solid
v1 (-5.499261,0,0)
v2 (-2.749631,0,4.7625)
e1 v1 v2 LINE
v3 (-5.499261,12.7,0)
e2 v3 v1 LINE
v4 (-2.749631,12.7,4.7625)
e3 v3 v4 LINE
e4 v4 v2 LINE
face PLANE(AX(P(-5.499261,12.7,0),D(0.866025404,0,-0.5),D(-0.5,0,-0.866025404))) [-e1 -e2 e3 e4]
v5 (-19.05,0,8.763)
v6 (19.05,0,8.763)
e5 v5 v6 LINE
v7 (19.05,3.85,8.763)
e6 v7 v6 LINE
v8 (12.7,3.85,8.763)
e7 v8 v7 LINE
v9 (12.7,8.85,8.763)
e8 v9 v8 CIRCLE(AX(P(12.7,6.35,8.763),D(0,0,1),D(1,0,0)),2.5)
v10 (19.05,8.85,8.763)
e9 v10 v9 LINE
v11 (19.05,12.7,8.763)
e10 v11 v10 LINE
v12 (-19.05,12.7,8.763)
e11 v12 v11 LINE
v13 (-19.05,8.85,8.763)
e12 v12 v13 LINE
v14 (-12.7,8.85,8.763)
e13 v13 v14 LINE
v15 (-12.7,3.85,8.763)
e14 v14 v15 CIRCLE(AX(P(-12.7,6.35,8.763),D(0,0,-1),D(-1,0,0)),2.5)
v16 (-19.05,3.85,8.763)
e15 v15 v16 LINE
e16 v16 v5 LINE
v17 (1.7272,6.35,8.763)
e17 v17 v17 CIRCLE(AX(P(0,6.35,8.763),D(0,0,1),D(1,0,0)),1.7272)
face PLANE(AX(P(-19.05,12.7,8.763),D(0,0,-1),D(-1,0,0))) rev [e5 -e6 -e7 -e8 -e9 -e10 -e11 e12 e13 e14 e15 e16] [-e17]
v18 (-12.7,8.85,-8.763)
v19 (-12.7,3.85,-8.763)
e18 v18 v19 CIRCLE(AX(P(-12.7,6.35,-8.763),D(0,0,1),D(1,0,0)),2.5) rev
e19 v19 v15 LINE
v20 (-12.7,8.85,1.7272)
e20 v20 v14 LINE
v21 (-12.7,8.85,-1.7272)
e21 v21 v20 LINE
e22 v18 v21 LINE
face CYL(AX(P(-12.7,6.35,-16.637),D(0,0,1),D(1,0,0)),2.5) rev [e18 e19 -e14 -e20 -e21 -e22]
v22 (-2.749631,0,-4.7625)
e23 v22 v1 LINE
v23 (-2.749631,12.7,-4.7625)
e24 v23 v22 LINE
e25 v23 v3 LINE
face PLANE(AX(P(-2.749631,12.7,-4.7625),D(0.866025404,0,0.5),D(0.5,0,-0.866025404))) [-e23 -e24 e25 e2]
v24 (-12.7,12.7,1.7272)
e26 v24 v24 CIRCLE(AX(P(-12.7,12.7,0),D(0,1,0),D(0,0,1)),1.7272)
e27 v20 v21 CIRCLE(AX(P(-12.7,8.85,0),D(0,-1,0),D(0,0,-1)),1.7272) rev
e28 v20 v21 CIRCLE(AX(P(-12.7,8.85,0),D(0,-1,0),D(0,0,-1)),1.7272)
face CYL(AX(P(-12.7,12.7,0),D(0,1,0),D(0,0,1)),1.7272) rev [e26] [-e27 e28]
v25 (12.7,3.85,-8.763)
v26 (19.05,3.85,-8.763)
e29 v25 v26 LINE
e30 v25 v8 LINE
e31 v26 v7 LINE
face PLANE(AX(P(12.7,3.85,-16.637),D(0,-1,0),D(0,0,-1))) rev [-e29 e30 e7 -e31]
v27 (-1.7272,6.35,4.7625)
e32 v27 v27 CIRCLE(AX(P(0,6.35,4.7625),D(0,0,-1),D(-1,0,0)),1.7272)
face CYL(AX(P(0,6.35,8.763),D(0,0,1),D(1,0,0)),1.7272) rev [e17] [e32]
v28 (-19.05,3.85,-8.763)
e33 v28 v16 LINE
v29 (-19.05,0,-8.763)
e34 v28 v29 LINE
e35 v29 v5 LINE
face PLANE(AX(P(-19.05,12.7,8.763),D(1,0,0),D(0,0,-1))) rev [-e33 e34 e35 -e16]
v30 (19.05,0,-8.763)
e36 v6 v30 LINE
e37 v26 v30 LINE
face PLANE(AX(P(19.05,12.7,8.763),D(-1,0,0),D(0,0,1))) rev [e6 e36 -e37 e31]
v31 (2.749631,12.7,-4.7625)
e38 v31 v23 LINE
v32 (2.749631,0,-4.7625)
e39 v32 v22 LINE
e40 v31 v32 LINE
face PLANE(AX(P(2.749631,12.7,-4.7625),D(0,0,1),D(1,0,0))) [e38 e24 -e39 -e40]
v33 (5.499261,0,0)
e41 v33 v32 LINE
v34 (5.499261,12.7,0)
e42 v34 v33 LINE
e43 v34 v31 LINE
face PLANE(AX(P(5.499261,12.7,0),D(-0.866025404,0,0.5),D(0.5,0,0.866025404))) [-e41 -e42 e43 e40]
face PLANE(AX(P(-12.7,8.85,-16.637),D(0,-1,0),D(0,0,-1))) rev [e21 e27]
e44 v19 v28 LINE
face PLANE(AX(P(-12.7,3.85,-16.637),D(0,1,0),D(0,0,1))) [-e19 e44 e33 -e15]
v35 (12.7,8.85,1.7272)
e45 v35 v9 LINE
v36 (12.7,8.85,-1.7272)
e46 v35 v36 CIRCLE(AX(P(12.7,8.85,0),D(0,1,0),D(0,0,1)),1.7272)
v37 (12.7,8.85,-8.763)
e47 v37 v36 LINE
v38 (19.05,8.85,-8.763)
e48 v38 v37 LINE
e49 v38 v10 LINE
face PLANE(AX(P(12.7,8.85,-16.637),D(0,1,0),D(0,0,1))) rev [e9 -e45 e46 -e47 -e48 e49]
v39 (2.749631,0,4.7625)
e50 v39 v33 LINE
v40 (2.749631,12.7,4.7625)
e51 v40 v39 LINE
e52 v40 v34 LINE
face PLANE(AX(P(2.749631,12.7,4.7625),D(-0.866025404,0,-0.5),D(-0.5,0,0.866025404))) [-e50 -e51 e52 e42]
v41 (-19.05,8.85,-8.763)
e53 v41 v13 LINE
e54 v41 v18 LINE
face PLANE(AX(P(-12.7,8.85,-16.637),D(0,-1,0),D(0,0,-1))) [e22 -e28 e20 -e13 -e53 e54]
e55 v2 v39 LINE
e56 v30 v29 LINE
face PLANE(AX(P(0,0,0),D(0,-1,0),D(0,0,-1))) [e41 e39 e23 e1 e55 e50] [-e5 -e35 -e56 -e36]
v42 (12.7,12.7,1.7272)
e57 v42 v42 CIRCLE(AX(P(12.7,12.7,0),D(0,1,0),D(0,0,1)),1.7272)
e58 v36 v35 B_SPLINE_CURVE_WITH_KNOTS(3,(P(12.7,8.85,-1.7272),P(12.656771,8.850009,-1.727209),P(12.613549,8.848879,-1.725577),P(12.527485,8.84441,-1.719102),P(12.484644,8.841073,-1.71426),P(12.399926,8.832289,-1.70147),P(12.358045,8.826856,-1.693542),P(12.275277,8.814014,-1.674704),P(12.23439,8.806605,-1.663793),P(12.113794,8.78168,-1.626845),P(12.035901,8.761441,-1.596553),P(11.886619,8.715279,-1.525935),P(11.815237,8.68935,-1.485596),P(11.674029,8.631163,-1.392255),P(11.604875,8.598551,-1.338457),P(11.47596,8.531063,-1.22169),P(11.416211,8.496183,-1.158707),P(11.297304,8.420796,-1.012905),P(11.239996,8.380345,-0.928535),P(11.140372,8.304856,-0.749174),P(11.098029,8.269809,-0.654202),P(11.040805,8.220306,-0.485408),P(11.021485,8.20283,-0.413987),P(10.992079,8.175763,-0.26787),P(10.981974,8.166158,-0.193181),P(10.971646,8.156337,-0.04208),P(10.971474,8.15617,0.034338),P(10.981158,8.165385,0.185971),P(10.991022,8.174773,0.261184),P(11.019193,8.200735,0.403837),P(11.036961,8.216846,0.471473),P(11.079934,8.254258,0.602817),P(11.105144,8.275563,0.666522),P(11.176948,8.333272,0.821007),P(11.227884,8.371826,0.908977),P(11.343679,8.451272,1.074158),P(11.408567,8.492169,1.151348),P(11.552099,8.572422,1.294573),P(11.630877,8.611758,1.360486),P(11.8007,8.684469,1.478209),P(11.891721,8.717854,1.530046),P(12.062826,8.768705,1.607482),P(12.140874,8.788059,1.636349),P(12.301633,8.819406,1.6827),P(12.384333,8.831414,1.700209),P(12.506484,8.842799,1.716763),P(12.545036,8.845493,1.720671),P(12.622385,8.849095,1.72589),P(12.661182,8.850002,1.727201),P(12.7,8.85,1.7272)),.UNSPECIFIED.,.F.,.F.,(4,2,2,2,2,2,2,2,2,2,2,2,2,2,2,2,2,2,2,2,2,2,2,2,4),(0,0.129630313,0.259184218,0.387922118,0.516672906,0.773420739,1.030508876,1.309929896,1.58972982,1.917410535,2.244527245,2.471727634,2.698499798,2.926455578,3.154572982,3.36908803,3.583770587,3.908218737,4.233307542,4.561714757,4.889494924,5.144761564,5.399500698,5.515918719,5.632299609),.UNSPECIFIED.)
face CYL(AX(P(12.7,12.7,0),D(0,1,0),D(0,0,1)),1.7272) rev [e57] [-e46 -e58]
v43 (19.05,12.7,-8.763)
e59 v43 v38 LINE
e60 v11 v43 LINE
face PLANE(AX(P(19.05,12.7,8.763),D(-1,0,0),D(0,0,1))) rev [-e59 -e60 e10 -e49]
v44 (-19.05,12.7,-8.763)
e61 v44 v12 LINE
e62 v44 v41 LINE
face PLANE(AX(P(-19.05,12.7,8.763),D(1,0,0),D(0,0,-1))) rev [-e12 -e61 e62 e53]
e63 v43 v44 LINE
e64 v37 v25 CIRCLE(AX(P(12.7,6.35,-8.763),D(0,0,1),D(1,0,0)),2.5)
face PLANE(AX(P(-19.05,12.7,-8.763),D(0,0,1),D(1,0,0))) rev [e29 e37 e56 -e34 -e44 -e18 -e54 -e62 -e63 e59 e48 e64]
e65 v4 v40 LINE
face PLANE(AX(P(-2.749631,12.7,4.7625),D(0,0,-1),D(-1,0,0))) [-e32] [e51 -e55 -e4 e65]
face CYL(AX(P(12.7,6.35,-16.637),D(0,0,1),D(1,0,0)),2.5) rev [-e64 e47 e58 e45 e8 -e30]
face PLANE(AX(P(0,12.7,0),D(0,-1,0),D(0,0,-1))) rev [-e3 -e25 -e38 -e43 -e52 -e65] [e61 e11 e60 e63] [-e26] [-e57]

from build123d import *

# Parameters (mm, degrees)
SKETCH1_W                  = 38.1
SKETCH1_H                  = 17.526
BOSS_EXTRUDE1_DEPTH        = 12.7
CUT_EXTRUDE1_DEPTH         = 25.4
F_8_32_TAPPED_HOLE1_REACH  = 26.515
F_8_32_TAPPED_HOLE1_BORE_R = 1.7272
MIRROR1_START              = -8.763
MIRROR1_DEPTH              = 17.526
MIRROR1_START_2            = 8.85
MIRROR1_2_OUTLINE_R        = 1.7272
MIRROR1_2_DEPTH            = 5.15
F_8_32_TAPPED_HOLE2_D      = 3.4544
F_8_32_TAPPED_HOLE2_DEPTH  = 10.668
F_8_32_TAPPED_HOLE2_TIP    = 1.037806461


with BuildPart() as part:
    # Sketch1 → Boss-Extrude1 (new body)
    with BuildSketch(Plane(origin=(0, 0, 0), x_dir=(1, 0, 0), z_dir=(0, 1, 0))):
        Rectangle(SKETCH1_W, SKETCH1_H)
        Polygon((5.499261314, 0), (2.749630657, 4.7625), (-2.749630657, 4.7625), (-5.499261314, 0), (-2.749630657, -4.7625), (2.749630657, -4.7625), align=None, mode=Mode.SUBTRACT)
    extrude(amount=BOSS_EXTRUDE1_DEPTH)

    # Sketch2 → Cut-Extrude1 (cut)
    with BuildSketch(Plane.XY.offset(8.763)):
        with BuildLine():
            Line((12.7, 8.85), (19.05, 8.85))
            ThreePointArc((19.05, 8.85), (21.55, 6.35), (19.05, 3.85))
            Line((19.05, 3.85), (12.7, 3.85))
            ThreePointArc((12.7, 3.85), (10.2, 6.35), (12.7, 8.85))
        make_face()
    extrude(amount=-CUT_EXTRUDE1_DEPTH, mode=Mode.SUBTRACT)

    # #8-32 Tapped Hole1 bore → #8-32 Tapped Hole1 (cut, up to next)
    with BuildSketch(Plane(origin=(0, 12.7, 0), x_dir=(1, 0, 0), z_dir=(0, 1, 0)), mode=Mode.PRIVATE) as f_8_32_tapped_hole1_sk1:
        with Locations((12.7, 0)):
            Circle(F_8_32_TAPPED_HOLE1_BORE_R)
    f_8_32_tapped_hole1_tool1 = extrude(f_8_32_tapped_hole1_sk1.sketch, amount=-F_8_32_TAPPED_HOLE1_REACH, mode=Mode.PRIVATE) & part.part
    add(f_8_32_tapped_hole1_tool1.solids().sort_by_distance((12.7, 12.7, 0))[0], mode=Mode.SUBTRACT)

    # Mirror1: read off the stored shape, not the designer's step
    # Mirror1 outline → Mirror1 (cut)
    with BuildSketch(Plane.XY.offset(MIRROR1_START)):
        with BuildLine():
            Line((-12.7, 8.85), (-19.05, 8.85))
            Line((-19.05, 8.85), (-19.05, 3.85))
            Line((-19.05, 3.85), (-12.7, 3.85))
            ThreePointArc((-12.7, 3.85), (-10.2, 6.35), (-12.7, 8.85))
        make_face()
    extrude(amount=MIRROR1_DEPTH, mode=Mode.SUBTRACT)

    # Mirror1 2 outline → Mirror1 2 (cut)
    with BuildSketch(Plane(origin=(0, 0, 0), x_dir=(1, 0, 0), z_dir=(0, 1, 0)).offset(MIRROR1_START_2)):
        with Locations((-12.7, 0)):
            Circle(MIRROR1_2_OUTLINE_R)
    extrude(amount=MIRROR1_2_DEPTH, mode=Mode.SUBTRACT)

    # #8-32 Tapped Hole2
    with Locations(Plane.XY.offset(8.763)):
        with Locations((0, 6.35)):
            Hole(F_8_32_TAPPED_HOLE2_D / 2, depth=F_8_32_TAPPED_HOLE2_DEPTH)
            with Locations((0, 0, -(F_8_32_TAPPED_HOLE2_DEPTH + F_8_32_TAPPED_HOLE2_TIP / 2))):  # 118° drill point
                Cone(0, F_8_32_TAPPED_HOLE2_D / 2, F_8_32_TAPPED_HOLE2_TIP, mode=Mode.SUBTRACT)


solid = part.part
